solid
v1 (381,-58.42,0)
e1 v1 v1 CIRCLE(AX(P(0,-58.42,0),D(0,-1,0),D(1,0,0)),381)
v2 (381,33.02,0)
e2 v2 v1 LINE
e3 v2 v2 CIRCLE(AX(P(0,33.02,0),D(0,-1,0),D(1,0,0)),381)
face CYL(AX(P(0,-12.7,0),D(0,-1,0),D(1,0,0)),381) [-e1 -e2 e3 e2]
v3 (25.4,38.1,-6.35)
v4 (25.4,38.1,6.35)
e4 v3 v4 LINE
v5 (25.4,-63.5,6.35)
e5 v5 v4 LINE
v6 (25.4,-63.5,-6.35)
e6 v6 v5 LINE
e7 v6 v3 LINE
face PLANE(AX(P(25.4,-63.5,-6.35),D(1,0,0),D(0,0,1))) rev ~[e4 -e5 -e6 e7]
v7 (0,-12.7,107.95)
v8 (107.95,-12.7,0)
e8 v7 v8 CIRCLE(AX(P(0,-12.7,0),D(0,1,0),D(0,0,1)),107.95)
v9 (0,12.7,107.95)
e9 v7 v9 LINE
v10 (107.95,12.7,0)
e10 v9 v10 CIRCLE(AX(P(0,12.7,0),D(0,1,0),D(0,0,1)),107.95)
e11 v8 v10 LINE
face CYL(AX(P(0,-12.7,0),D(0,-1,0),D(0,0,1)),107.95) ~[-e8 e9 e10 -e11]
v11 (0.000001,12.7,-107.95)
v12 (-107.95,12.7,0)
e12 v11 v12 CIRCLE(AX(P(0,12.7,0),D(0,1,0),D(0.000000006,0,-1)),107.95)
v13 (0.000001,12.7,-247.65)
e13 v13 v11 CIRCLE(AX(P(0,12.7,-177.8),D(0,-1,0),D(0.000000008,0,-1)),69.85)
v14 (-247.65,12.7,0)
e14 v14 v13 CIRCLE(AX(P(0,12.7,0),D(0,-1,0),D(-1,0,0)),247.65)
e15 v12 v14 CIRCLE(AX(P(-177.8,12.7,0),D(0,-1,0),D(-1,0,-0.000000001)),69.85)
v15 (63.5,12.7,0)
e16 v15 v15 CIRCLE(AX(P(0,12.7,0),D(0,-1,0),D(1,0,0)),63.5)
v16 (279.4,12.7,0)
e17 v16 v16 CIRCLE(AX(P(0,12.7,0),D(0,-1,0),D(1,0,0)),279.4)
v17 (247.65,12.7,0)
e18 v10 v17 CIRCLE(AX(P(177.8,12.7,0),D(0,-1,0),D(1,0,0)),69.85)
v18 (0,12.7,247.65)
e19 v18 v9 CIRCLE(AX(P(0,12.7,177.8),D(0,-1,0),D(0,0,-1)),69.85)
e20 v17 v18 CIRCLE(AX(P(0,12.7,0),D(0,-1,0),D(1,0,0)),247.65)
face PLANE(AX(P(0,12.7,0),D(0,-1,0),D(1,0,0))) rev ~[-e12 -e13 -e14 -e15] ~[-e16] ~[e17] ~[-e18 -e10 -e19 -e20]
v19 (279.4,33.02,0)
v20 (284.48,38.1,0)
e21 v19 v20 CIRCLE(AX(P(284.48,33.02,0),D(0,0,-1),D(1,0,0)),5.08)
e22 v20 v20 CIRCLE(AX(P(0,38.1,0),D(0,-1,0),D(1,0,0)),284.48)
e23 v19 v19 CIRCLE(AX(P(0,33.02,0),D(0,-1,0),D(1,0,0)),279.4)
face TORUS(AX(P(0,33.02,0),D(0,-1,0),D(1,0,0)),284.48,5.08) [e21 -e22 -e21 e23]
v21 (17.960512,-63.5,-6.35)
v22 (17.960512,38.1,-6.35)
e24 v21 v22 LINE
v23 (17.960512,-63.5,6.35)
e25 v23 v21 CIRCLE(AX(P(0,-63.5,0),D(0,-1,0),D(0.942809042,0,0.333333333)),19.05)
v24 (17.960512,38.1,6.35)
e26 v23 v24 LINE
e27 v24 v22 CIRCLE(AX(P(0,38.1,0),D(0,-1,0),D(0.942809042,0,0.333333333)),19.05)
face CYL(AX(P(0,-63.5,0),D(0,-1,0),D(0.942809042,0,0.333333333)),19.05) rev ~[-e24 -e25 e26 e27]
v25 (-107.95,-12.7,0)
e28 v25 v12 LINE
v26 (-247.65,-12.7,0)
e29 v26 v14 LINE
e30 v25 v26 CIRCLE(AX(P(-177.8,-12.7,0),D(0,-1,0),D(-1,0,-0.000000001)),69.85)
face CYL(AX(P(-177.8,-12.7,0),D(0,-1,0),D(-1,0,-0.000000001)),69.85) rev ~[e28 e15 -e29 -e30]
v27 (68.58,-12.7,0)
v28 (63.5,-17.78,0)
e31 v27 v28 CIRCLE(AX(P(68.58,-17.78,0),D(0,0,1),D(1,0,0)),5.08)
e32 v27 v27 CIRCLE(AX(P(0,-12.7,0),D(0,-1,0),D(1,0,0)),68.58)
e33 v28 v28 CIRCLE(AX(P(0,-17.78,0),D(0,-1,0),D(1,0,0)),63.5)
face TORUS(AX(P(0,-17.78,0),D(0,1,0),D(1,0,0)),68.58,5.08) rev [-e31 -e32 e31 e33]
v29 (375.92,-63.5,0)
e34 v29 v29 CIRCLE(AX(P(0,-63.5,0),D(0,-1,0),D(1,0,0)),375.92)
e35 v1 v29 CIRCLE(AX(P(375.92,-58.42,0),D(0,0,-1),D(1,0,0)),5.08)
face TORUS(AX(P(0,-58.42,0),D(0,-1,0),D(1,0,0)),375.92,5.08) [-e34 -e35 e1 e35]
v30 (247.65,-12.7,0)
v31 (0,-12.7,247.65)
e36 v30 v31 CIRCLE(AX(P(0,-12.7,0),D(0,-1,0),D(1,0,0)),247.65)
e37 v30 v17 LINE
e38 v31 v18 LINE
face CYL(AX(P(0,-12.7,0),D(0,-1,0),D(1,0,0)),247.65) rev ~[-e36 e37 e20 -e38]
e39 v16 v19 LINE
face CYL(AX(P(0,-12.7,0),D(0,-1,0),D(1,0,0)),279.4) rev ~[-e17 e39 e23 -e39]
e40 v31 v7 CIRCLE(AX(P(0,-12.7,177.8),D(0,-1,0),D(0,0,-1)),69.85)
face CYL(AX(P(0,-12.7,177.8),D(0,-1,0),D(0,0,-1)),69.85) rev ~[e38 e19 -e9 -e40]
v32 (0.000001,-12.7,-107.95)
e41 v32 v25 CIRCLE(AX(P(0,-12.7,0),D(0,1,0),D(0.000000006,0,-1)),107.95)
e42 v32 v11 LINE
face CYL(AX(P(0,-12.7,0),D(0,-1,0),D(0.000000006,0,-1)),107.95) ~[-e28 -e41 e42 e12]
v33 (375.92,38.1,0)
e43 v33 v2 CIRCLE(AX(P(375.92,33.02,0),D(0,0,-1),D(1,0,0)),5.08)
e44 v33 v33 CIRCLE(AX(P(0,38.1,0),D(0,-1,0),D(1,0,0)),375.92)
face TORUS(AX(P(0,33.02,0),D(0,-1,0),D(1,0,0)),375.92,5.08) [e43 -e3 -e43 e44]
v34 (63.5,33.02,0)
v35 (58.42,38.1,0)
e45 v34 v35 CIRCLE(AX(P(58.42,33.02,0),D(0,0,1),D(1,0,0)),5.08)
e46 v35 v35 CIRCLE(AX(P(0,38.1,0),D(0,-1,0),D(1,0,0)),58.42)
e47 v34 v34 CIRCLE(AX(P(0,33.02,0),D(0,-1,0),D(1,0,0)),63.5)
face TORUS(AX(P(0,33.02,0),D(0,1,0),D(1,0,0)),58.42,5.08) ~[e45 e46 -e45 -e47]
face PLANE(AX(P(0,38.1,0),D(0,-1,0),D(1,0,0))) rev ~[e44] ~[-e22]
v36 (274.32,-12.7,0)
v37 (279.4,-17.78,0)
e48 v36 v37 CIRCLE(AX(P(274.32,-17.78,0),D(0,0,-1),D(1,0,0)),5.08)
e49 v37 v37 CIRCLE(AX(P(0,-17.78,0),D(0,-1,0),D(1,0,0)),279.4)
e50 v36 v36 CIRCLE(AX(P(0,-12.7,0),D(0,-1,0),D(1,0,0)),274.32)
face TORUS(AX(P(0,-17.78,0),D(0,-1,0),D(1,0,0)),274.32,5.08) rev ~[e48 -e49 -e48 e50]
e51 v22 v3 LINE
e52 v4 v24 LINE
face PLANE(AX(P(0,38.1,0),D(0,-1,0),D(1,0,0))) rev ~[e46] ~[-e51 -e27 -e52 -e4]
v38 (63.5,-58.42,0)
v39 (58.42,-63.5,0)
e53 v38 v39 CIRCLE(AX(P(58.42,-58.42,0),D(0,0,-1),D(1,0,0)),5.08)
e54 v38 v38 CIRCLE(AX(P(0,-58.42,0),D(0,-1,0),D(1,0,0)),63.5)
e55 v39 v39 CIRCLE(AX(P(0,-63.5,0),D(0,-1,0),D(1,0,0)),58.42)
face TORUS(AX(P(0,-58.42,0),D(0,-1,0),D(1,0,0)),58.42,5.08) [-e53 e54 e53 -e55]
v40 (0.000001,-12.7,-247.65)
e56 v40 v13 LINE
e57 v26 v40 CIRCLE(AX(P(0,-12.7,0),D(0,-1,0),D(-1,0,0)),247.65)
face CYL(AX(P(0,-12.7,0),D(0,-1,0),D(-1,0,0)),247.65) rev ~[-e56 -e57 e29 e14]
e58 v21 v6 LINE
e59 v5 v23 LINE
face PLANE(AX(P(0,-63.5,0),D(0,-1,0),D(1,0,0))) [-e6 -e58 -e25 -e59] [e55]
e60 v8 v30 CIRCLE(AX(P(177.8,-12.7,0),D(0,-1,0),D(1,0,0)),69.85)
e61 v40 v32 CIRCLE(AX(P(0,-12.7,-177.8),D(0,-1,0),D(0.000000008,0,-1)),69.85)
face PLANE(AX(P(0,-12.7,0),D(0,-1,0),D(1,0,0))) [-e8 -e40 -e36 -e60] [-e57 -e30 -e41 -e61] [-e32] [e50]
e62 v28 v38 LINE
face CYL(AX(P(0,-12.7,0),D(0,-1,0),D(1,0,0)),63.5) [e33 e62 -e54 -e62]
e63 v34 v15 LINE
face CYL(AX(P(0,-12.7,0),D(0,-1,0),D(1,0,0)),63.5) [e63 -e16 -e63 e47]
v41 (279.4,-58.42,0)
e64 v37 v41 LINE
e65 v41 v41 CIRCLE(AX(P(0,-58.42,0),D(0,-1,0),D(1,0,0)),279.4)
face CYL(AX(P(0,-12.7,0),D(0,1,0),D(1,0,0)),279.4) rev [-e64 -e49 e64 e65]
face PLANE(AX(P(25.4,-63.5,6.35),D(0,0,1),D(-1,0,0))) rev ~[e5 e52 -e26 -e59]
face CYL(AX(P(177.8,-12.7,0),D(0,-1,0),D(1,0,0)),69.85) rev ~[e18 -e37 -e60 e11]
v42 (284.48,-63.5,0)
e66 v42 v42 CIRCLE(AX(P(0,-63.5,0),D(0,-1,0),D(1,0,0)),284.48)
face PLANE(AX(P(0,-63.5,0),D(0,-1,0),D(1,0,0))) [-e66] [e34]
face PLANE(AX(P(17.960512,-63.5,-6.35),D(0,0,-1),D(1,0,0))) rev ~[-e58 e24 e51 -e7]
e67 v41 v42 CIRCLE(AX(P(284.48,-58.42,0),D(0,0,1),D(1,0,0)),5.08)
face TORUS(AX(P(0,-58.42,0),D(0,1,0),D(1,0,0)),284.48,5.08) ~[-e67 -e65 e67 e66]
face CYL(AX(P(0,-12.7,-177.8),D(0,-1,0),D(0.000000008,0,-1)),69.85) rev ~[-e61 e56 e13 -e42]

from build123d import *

# Parameters (mm, degrees)
F0_R     = 381
F1_DEPTH = 12.7
F2_R     = 381
F2_R_2   = 279.4
F2_R_3   = 63.5
F3_DEPTH = 50.8
F6_DEPTH = 25.4
F7_R     = 5.08
F9_DEPTH = 101.6


# Not quite as in the source:
# - a feature names something its author has since deleted; it is built from what else it names


with BuildPart() as f1:
    # F0 (on Front) → F1 (new body, symmetric)
    with BuildSketch(Plane.XZ):
        Circle(F0_R)
    extrude(amount=F1_DEPTH, both=True)

    # F2 (on face) → F3 (join, symmetric)
    with BuildSketch(Plane.XZ.offset(12.7)):
        Circle(F2_R)
        Circle(F2_R_2, mode=Mode.SUBTRACT)
        Circle(F2_R_3)
    extrude(amount=F3_DEPTH, both=True)

    # F5 (on face) → F6 (cut)
    with BuildSketch(Plane.XZ.offset(12.7)):
        with BuildLine():
            ThreePointArc((107.95, 0), (177.8, 69.85), (247.65, 0))
            ThreePointArc((247.65, 0), (175.1149943608, 175.1149943608), (0, 247.65))
            ThreePointArc((0, 247.65), (49.3914086659, 227.1914086659), (69.85, 177.8))
            ThreePointArc((69.85, 177.8), (49.3914086659, 128.4085913342), (2e-10, 107.95))
            ThreePointArc((2e-10, 107.95), (76.3321770291, 76.332177029), (107.95, 0))
        make_face()
        with BuildLine():
            ThreePointArc((-247.65, -7.01e-08), (-175.1149941454, -175.1149945763), (5.392e-07, -247.65))
            ThreePointArc((5.392e-07, -247.65), (-69.85, -177.7999999633), (6.127e-07, -107.95))
            ThreePointArc((6.127e-07, -107.95), (-76.3321768125, -76.3321772457), (-107.95, 0))
            ThreePointArc((-107.95, 0), (-177.799999965, -69.85), (-247.65, -7.01e-08))
        make_face()
        with BuildLine():
            ThreePointArc((69.85, 177.8), (49.3914086659, 227.1914086659), (0, 247.65))
            ThreePointArc((0, 247.65), (-69.85, 177.7999999999), (2e-10, 107.95))
            ThreePointArc((2e-10, 107.95), (49.3914086659, 128.4085913342), (69.85, 177.8))
        make_face()
        with BuildLine():
            ThreePointArc((-107.95, 0), (-177.800000035, 69.85), (-247.65, -7.01e-08))
            ThreePointArc((-247.65, -7.01e-08), (-177.799999965, -69.85), (-107.95, 0))
        make_face()
        with BuildLine():
            ThreePointArc((6.127e-07, -107.95), (-69.85, -177.7999999633), (5.392e-07, -247.65))
            ThreePointArc((5.392e-07, -247.65), (49.3914088565, -227.1914084752), (69.85, -177.8))
            ThreePointArc((69.85, -177.8), (49.3914088825, -128.4085915507), (6.127e-07, -107.95))
        make_face()
        with BuildLine():
            ThreePointArc((107.95, 0), (177.8, -69.85), (247.65, 0))
            ThreePointArc((247.65, 0), (177.8, 69.85), (107.95, 0))
        make_face()
    extrude(amount=-F6_DEPTH, mode=Mode.SUBTRACT)

    # F7
    f7_edges = [f1.edges().sort_by_distance(p)[0] for p in [
        (-63.5, -12.7, 0),
        (-279.4, -63.5, 0),
        (-381, -63.5, 0),
        (-63.5, 38.1, 0),
        (-381, 38.1, 0),
        (-279.4, 38.1, 0),
        (-279.4, -12.7, 0),
        (-63.5, -63.5, 0),
    ]]
    fillet(f7_edges, radius=F7_R)

    # F8 (on face) → F9 (cut)
    with BuildSketch(Plane.XZ.offset(63.5)):
        with BuildLine():
            ThreePointArc((17.9605122421, -6.35), (18.7756525614, -3.2213926947), (19.05, 0))
            ThreePointArc((19.05, 0), (18.7756525614, 3.2213926947), (17.9605122421, 6.35))
            Line((17.9605122421, 6.35), (-6.5611318409, 6.35))
            Line((-6.5611318409, 6.35), (-6.5611318409, -6.35))
            Line((-6.5611318409, -6.35), (17.9605122421, -6.35))
        make_face()
        with BuildLine():
            ThreePointArc((17.9605122421, 6.35), (18.7756525614, 3.2213926947), (19.05, 0))
            ThreePointArc((19.05, 0), (18.7756525614, -3.2213926947), (17.9605122421, -6.35))
            Line((17.9605122421, -6.35), (25.4, -6.35))
            Line((25.4, -6.35), (25.4, 6.35))
            Line((25.4, 6.35), (17.9605122421, 6.35))
        make_face()
        with BuildLine():
            Line((-6.5611318409, 6.35), (17.9605122421, 6.35))
            ThreePointArc((17.9605122421, 6.35), (-19.05, 0), (17.9605122421, -6.35))
            Line((17.9605122421, -6.35), (-6.5611318409, -6.35))
            Line((-6.5611318409, -6.35), (-6.5611318409, 6.35))
        make_face()
    extrude(amount=-F9_DEPTH, mode=Mode.SUBTRACT)


solid = f1.part
